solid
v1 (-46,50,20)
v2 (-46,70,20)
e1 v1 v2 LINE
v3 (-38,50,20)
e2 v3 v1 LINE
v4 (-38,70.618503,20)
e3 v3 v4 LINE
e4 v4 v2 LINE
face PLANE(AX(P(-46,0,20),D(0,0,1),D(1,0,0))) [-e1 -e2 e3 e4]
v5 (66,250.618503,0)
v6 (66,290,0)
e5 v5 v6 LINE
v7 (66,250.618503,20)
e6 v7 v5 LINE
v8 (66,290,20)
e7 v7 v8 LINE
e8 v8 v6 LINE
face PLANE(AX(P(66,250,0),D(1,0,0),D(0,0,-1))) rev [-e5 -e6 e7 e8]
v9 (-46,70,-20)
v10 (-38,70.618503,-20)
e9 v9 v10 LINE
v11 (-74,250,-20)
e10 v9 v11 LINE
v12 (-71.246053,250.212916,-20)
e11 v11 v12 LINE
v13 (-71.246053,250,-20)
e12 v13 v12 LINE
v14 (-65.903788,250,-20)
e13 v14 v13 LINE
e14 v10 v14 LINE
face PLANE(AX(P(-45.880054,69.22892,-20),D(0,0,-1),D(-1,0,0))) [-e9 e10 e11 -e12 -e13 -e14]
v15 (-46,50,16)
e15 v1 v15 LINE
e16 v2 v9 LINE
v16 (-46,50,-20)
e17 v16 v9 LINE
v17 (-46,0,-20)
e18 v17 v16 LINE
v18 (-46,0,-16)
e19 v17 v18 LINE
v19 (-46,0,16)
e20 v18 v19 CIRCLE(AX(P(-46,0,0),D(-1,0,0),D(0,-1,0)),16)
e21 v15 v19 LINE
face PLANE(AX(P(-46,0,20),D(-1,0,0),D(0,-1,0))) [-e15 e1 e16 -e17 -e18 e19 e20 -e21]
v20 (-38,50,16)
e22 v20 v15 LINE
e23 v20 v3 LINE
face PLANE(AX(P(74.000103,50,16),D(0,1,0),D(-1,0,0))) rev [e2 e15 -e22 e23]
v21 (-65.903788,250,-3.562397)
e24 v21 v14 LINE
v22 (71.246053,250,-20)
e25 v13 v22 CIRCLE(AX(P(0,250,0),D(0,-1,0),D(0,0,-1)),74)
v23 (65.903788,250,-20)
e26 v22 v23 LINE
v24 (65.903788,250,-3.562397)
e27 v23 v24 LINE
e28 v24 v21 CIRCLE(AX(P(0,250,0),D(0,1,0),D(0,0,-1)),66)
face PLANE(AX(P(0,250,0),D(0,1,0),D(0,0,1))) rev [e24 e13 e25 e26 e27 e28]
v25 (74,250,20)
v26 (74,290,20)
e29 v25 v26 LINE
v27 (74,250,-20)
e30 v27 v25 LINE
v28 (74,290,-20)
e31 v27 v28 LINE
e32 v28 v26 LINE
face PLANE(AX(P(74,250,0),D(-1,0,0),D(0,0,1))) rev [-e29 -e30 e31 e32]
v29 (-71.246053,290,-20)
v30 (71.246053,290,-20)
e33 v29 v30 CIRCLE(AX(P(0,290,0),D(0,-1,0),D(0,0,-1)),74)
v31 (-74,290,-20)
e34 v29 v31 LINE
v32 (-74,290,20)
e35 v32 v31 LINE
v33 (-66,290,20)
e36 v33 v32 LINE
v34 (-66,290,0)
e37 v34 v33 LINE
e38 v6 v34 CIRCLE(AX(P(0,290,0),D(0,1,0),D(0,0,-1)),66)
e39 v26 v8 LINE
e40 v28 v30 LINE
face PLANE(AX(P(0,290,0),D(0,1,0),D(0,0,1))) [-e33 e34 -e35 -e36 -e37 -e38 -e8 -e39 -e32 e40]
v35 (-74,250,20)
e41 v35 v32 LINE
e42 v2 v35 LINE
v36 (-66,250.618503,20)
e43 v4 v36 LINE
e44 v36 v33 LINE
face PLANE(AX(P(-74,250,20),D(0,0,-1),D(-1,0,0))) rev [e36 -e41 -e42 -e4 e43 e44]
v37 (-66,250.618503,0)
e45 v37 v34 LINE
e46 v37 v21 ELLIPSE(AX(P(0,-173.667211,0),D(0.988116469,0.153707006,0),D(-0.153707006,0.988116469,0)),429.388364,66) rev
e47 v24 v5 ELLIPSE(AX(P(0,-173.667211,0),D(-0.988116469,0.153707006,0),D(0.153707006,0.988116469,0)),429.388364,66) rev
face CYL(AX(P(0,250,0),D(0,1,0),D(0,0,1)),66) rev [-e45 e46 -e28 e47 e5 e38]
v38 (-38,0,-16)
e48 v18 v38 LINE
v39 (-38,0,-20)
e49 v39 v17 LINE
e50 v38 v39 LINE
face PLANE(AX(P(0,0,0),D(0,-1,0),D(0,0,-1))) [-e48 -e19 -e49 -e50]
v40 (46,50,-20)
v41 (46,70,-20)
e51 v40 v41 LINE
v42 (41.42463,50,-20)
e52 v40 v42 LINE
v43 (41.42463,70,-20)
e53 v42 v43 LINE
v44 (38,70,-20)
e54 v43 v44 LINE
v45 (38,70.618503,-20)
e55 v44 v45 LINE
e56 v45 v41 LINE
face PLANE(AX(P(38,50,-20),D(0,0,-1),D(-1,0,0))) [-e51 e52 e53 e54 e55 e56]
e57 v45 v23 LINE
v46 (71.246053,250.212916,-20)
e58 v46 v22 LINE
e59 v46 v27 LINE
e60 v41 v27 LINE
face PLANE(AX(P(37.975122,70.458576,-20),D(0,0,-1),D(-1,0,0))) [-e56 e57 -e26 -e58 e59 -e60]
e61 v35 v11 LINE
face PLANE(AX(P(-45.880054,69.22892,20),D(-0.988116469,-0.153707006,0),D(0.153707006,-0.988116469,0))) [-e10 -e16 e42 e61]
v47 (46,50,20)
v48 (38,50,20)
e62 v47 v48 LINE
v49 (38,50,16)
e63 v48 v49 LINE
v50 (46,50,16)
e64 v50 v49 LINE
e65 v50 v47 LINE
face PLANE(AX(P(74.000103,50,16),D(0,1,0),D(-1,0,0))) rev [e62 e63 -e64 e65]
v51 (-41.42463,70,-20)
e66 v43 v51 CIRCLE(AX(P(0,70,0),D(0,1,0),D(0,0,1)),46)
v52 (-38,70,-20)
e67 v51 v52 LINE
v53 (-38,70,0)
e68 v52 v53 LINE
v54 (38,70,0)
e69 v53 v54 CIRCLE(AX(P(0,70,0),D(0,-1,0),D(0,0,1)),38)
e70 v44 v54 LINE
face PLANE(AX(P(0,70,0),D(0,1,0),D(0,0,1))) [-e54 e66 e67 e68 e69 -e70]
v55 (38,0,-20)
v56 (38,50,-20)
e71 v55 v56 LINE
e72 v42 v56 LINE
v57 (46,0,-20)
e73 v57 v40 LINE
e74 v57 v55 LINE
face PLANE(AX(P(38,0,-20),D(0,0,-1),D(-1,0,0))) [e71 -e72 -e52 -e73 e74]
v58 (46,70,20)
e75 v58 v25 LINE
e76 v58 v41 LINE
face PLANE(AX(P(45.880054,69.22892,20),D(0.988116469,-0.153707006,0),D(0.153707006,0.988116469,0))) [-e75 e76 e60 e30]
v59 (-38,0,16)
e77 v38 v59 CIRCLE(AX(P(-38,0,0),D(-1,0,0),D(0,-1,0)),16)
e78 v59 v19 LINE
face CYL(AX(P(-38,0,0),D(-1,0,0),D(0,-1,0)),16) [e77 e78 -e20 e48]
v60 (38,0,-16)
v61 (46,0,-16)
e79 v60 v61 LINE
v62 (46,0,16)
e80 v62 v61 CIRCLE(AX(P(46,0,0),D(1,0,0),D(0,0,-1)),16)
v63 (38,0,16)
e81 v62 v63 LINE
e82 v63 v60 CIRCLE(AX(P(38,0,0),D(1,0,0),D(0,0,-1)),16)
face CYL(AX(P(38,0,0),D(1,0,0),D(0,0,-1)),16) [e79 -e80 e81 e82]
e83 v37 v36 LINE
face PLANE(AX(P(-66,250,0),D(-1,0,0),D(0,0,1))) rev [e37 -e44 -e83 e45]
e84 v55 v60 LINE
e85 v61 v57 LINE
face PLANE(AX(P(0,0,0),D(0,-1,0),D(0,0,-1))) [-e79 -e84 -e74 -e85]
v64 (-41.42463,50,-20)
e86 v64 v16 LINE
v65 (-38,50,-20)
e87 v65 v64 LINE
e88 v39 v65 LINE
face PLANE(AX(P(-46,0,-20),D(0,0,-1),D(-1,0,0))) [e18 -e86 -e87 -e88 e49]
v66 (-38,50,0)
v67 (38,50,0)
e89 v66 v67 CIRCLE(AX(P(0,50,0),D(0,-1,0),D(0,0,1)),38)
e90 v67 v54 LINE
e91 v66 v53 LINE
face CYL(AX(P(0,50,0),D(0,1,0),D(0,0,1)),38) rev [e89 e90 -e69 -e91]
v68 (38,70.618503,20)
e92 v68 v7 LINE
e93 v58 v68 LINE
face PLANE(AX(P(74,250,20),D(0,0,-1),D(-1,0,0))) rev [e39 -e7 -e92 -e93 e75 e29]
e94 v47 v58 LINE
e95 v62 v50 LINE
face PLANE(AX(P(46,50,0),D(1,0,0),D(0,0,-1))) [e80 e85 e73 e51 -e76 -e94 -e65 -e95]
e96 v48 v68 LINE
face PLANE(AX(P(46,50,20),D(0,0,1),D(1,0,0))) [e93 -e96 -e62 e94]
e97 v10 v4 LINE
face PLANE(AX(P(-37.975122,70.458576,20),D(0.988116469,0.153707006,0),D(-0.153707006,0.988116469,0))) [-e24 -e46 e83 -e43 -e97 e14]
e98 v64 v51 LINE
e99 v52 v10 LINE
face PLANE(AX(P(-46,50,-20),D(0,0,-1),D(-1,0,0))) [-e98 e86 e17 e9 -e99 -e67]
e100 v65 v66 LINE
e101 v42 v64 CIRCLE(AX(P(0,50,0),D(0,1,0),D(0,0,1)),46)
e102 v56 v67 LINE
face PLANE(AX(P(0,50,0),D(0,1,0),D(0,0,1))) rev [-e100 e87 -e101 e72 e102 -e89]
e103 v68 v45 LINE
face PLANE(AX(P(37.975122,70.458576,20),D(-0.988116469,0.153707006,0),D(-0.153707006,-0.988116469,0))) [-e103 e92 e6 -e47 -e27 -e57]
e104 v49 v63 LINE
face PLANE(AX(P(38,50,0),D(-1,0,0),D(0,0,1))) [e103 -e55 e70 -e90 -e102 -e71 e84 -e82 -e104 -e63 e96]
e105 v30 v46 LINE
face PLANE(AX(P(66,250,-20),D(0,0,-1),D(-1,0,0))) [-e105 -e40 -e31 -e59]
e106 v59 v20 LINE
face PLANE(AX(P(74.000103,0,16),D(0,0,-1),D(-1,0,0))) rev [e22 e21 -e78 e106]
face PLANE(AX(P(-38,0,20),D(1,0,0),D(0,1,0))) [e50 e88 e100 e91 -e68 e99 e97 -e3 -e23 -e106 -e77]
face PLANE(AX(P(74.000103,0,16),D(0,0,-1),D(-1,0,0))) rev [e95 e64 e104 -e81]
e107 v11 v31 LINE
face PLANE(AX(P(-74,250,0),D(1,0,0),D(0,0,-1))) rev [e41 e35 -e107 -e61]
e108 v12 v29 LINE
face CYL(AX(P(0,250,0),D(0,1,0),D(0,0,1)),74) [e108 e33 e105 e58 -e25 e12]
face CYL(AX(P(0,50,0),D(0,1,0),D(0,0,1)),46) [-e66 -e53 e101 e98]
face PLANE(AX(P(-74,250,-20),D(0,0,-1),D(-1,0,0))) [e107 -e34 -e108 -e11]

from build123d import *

# Parameters (mm, degrees)
EXTRUDE_4_DEPTH     = 20
EXTRUDE_START       = 50
EXTRUDE_8_DEPTH     = 20
SKETCH_16_W         = 8
SKETCH_16_H         = 40
SKETCH_19_W         = 8
SKETCH_19_H         = 40
SKETCH_21_R         = 16
EXTRUDE_13_DEPTH    = 8
EXTRUDE_START_2     = -8
SKETCH_22_R         = 16
EXTRUDE_14_DEPTH    = 8
SKETCH_23_W         = 7.590296008
SKETCH_23_H         = 50
CUT_EXTRUDE_2_DEPTH = 323.453097365


# Read off the part's stored shape, not the designer's step: 凸台-拉伸8
with BuildPart() as part:
    # Sketch 3D_1 → 凸台-拉伸4 (new, symmetric)
    with BuildSketch(Plane(origin=(-74, 270, 0), x_dir=(0.9909924304103234, 0, 0.13391789600139506), z_dir=(0, -1, 0))):
        with BuildLine():
            Line((0, 0), (2.67835792, 19.819848608))
            Line((2.67835792, 19.819848608), (10.606297363, 18.74850544))
            Line((10.606297363, 18.74850544), (7.927939443, -1.071343168))
            ThreePointArc((7.927939443, -1.071343168), (64.494858714, -75.315424711), (138.738940257, -18.74850544))
            Line((138.738940257, -18.74850544), (141.417298177, 1.071343168))
            Line((141.417298177, 1.071343168), (149.345237621, 0))
            Line((149.345237621, 0), (146.666879701, -19.819848608))
            ThreePointArc((146.666879701, -19.819848608), (63.423515546, -83.243364154), (0, 0))
        make_face()
    extrude(amount=EXTRUDE_4_DEPTH, both=True)



with BuildPart() as body_2:
    # 凸台-拉伸8 outline → 凸台-拉伸8 (new body)
    with BuildSketch(Plane(origin=(0, 0, 0), x_dir=(1, 0, 0), z_dir=(0, 1, 0)).offset(EXTRUDE_START)):
        with BuildLine():
            Line((38, 0), (38, -20))
            Line((38, -20), (46, -20))
            Line((46, -20), (46, 0))
            ThreePointArc((46, 0), (0, 46), (-46, 0))
            Line((-46, 0), (-46, -20))
            Line((-46, -20), (-38, -20))
            Line((-38, -20), (-38, 0))
            ThreePointArc((-38, 0), (0, 38), (38, 0))
        make_face()
    extrude(amount=EXTRUDE_8_DEPTH)


with BuildPart() as part_1:
    add(part.part)

    add(body_2.part)  # 扫描5 merges body 2
    # 扫描5: sweep along a path in 草图18
    with BuildLine(Plane.XY.offset(20)) as sweep_5_path:
        Line((-46, 0), (-46, 50))
        Line((-46, 50), (-46, 70))
        Line((-46, 70), (-74, 250))
        Line((-74, 250), (-74, 290))
    # 草图16 → 扫描5 (sweep)
    with BuildSketch(Plane(origin=(0, 0, 0), x_dir=(1, 0, 0), z_dir=(0, 1, 0))):
        with Locations((-42, 0)):
            Rectangle(SKETCH_16_W, SKETCH_16_H)
    sweep(path=sweep_5_path.line, transition=Transition.RIGHT)

    # 扫描6: sweep along a path in 草图20
    with BuildLine(Plane.XY.offset(20)) as sweep_6_path:
        Line((46, 0), (46, 50))
        Line((46, 50), (46, 70))
        Line((46, 70), (74, 250))
        Line((74, 250), (74, 290))
    # 草图19 → 扫描6 (sweep)
    with BuildSketch(Plane(origin=(0, 0, 0), x_dir=(1, 0, 0), z_dir=(0, 1, 0))):
        with Locations((42, 0)):
            Rectangle(SKETCH_19_W, SKETCH_19_H)
    sweep(path=sweep_6_path.line, transition=Transition.RIGHT)

    # 草图21 → 凸台-拉伸13 (add)
    with BuildSketch(Plane(origin=(46, 0, 0), x_dir=(0, 0, -1), z_dir=(1, 0, 0))):
        Circle(SKETCH_21_R)
    extrude(amount=-EXTRUDE_13_DEPTH)

    # 草图22 → 凸台-拉伸14 (add)
    with BuildSketch(Plane.ZY.offset(46).offset(EXTRUDE_START_2)):
        Circle(SKETCH_22_R)
    extrude(amount=EXTRUDE_14_DEPTH)

    # 草图23 → 切除-拉伸2 (cut, through all)
    with BuildSketch(Plane.ZY.offset(46)):
        with Locations((19.795148004, 25)):
            Rectangle(SKETCH_23_W, SKETCH_23_H)
    extrude(amount=-CUT_EXTRUDE_2_DEPTH, mode=Mode.SUBTRACT)


solid = part_1.part
